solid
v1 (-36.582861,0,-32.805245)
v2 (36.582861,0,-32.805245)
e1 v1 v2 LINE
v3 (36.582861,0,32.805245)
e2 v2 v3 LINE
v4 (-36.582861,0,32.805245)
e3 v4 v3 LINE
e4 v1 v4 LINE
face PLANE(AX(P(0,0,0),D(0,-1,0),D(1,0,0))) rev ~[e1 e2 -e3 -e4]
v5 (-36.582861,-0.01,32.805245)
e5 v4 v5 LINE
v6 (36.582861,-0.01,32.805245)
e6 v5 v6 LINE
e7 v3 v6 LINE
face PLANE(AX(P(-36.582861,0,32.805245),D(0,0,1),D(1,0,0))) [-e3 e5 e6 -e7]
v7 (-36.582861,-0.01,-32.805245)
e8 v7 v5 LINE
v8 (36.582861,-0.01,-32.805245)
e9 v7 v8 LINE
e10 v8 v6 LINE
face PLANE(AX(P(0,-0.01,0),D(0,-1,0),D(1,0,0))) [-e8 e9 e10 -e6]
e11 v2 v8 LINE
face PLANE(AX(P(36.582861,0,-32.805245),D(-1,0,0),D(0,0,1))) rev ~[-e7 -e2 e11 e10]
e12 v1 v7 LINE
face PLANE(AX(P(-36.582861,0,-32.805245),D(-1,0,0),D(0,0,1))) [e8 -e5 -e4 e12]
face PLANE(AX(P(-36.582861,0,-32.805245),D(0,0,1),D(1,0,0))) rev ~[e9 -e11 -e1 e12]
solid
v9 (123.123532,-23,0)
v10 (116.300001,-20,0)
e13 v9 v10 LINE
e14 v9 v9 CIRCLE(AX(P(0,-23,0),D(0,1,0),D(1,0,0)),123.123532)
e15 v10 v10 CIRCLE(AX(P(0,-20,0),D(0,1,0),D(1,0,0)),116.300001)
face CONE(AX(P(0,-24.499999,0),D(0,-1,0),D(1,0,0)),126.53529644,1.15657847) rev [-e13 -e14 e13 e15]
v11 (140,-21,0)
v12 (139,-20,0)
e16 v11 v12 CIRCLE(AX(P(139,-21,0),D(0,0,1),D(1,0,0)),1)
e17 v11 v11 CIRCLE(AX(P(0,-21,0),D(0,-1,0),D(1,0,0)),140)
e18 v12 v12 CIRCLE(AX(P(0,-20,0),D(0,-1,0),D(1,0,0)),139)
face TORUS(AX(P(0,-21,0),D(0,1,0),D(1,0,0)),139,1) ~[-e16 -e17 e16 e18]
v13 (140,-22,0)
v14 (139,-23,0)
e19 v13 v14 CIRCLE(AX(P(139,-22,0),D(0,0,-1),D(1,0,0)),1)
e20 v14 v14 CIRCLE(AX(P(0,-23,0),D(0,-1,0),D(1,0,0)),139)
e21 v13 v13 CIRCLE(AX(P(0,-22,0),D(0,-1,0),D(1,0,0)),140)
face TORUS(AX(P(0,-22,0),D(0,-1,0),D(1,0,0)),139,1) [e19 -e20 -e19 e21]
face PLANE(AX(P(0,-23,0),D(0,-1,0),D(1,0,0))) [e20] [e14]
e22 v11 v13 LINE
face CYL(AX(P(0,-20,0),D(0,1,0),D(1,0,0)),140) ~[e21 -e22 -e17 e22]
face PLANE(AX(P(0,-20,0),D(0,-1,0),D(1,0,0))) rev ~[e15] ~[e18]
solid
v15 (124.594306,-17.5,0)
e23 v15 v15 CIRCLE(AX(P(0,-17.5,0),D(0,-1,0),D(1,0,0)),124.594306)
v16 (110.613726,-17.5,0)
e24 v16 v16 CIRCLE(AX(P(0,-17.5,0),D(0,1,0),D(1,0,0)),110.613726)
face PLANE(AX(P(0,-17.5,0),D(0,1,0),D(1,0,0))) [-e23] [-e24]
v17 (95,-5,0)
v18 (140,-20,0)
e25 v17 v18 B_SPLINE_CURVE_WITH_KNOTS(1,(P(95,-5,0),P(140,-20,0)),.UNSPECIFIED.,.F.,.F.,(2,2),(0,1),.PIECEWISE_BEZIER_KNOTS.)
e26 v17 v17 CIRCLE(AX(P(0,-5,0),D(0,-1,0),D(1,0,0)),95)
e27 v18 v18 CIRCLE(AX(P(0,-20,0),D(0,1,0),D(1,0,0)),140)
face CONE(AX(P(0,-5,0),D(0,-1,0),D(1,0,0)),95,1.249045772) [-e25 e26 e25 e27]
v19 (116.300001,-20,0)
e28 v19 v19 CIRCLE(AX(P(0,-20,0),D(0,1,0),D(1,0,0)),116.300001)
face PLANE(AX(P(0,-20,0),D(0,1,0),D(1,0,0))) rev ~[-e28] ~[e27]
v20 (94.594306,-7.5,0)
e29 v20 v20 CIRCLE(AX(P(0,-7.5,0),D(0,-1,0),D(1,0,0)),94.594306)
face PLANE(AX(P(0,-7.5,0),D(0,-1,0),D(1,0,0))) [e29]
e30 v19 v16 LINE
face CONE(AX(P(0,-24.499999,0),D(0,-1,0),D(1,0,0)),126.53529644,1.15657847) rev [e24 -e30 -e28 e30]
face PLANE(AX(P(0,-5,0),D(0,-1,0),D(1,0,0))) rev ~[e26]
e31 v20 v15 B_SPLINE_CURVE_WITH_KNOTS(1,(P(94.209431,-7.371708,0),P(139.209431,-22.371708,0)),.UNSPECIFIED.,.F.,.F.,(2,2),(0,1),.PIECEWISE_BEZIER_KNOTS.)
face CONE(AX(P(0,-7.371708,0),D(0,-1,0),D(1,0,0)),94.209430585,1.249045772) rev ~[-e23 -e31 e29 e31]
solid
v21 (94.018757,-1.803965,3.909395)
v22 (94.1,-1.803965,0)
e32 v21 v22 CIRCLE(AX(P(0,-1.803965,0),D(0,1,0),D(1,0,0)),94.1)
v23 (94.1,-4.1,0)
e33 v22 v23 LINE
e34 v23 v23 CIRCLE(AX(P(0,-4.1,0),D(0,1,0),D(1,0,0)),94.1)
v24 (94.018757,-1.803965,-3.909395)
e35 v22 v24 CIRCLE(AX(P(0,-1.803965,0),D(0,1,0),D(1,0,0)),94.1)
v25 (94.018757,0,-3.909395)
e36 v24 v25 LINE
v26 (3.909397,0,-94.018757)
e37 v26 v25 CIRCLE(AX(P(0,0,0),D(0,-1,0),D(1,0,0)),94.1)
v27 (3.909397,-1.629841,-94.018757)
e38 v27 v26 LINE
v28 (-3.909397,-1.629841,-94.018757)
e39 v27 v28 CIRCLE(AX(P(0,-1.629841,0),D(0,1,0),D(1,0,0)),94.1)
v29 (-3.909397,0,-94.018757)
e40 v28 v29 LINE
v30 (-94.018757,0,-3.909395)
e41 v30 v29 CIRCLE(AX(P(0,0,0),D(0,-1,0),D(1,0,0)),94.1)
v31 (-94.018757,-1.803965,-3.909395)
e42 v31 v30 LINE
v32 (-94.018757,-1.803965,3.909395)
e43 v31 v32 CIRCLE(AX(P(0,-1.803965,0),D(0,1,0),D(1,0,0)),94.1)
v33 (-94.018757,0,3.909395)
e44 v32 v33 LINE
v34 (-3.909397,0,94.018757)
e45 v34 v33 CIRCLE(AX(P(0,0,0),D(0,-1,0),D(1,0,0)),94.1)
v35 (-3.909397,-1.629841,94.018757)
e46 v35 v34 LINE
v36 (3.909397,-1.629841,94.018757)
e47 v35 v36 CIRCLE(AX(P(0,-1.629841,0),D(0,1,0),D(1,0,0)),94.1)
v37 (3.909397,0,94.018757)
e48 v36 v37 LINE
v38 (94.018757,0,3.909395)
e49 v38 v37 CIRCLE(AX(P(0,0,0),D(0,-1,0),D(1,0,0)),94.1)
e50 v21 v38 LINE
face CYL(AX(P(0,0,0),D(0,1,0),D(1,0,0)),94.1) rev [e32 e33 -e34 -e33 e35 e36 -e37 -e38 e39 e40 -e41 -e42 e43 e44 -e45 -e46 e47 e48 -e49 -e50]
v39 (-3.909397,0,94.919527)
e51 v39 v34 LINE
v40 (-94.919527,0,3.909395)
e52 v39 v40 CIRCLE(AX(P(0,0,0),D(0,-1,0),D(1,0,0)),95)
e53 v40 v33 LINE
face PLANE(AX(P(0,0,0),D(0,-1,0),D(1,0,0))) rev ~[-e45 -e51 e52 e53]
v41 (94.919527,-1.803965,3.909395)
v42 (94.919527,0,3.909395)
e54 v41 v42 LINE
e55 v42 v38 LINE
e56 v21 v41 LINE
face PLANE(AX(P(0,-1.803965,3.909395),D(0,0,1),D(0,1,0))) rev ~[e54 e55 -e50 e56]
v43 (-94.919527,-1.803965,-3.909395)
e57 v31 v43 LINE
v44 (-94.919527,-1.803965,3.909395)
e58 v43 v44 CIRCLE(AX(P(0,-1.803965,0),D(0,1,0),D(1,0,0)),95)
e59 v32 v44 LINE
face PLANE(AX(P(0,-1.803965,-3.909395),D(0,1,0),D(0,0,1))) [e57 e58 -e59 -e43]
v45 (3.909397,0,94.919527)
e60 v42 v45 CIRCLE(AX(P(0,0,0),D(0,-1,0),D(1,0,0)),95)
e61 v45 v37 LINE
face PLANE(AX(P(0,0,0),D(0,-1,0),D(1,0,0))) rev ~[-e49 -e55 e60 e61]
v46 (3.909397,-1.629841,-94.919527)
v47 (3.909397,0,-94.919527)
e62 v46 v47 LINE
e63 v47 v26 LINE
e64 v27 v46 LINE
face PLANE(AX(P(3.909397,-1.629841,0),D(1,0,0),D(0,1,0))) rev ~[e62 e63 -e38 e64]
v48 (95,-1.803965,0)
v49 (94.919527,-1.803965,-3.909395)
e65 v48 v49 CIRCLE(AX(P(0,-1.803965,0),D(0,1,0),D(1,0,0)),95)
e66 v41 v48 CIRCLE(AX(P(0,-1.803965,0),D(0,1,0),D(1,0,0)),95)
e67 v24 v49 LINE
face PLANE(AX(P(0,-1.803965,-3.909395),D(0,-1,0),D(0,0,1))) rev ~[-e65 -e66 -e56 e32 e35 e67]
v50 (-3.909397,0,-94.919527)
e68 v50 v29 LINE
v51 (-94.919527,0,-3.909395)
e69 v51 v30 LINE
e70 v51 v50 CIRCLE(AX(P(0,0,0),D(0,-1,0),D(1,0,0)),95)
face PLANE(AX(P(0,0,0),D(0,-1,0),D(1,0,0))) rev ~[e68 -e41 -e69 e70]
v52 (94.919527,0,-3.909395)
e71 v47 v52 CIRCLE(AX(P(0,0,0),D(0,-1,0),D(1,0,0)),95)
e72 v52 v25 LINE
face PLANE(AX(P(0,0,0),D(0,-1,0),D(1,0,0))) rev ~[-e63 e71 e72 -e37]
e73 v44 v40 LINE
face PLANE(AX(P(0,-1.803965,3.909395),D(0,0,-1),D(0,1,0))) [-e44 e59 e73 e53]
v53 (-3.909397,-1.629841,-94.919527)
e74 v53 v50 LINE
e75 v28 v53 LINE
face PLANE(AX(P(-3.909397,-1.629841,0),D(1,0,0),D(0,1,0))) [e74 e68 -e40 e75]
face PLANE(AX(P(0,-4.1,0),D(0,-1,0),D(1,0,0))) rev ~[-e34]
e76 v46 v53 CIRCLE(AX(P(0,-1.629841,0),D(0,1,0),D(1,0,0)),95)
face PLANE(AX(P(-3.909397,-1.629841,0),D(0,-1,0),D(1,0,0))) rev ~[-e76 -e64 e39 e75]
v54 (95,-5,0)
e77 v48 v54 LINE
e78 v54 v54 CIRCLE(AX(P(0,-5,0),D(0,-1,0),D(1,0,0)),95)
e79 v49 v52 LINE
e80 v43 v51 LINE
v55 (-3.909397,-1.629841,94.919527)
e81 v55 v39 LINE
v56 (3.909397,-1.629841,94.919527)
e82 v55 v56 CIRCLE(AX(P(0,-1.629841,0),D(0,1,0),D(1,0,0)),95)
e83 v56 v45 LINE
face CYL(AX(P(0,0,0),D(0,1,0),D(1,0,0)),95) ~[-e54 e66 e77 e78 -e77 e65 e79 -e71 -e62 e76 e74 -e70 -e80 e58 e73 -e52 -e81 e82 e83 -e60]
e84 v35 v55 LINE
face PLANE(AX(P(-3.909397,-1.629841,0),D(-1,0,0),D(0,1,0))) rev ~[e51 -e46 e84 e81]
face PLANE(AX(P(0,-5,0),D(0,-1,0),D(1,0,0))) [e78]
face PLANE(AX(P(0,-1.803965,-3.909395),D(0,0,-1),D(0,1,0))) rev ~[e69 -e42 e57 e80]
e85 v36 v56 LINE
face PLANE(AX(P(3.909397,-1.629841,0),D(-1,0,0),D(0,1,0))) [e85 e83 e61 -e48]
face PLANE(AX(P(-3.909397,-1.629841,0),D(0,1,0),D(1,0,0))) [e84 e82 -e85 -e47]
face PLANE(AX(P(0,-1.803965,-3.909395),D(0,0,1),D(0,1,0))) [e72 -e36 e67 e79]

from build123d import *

# Parameters (mm, degrees)
F0_R           = 95
F1_DEPTH       = 5
F2_T           = -0.9
F4_R           = 140
F5_DEPTH       = 3
F1_FACE_R      = 95
F5_FACE_R      = 140
F8_R           = 1
F9_T           = -2.5
F10_W          = 7.818793878
F10_H          = 3.2596825622
F11_DEPTH      = 109.4
F11_DEPTH_BACK = 153.9
F12_W          = 3.6079295565
F12_H          = 7.81879
F13_DEPTH      = 116
F13_DEPTH_BACK = 123
F14_W          = 73.1657221913
F14_H          = 65.6104907393
F15_DEPTH      = 0.01


# Not quite as in the source:
# - a feature of the source that left no trace in its solid (it failed there, or was rolled back) is left out


with BuildPart() as f1:
    # F0 (on Front) → F1 (new body)
    with BuildSketch(Plane.XZ):
        Circle(F0_R)
    extrude(amount=F1_DEPTH)

    # F2
    f2_openings = [f1.faces().sort_by_distance(p)[0] for p in [
        (0, 0, 0),
    ]]
    offset(amount=F2_T, openings=f2_openings)

    # F10 (on Top) → F11 (cut, two sides)
    with BuildSketch(Plane.XY) as f11_sk:
        Rectangle(F10_W, F10_H)
    extrude(amount=-F11_DEPTH, mode=Mode.SUBTRACT)
    extrude(f11_sk.sketch, amount=F11_DEPTH_BACK, mode=Mode.SUBTRACT)

    # F12 (on Right) → F13 (cut, two sides)
    with BuildSketch(Plane.YZ) as f13_sk:
        Rectangle(F12_W, F12_H)
    extrude(amount=-F13_DEPTH, mode=Mode.SUBTRACT)
    extrude(f13_sk.sketch, amount=F13_DEPTH_BACK, mode=Mode.SUBTRACT)


with BuildPart() as f5:
    # F4 (on offset) → F5 (new body)
    with BuildSketch(Plane.XZ.offset(20)):
        Circle(F4_R)
    extrude(amount=F5_DEPTH)

    # F8
    f8_edges = [f5.edges().sort_by_distance(p)[0] for p in [
        (-140, -20, 0),
        (-140, -23, 0),
    ]]
    fillet(f8_edges, radius=F8_R)


with BuildPart() as f6:
    # F1_face (on face) → F6 section 0
    with BuildSketch(Plane.XZ.offset(5)):
        Circle(F1_FACE_R)
    # F5_face (on face) → F6 section 1
    with BuildSketch(Plane(origin=(0, -20, 0), x_dir=(1, 0, 0), z_dir=(0, 1, 0))):
        Circle(F5_FACE_R)
    loft()

    # F9 (hollow: no face is removed)
    offset(amount=F9_T, mode=Mode.SUBTRACT)


with BuildPart() as f15:
    # F14 (on Front) → F15 (new body)
    with BuildSketch(Plane.XZ):
        Rectangle(F14_W, F14_H)
    extrude(amount=F15_DEPTH)


with BuildPart() as f17_tool:
    # F16 (on Top) → F17 (revolve)
    with BuildSketch(Plane.XY):
        Polygon((93.0999964476, -9.8000001162), (0, -9.8000001162), (0, -30.2647054195), (126.5352964401, -24.4999993593), align=None)
    revolve(axis=Axis((0, -20.0323527679, 0), (0, -1, 0)))


with BuildPart() as f5_1:
    add(f5.part)

    # F17: cut by f17_tool
    add(f17_tool.part, mode=Mode.SUBTRACT)


with BuildPart() as f6_1:
    add(f6.part)

    # F17: cut by f17_tool
    add(f17_tool.part, mode=Mode.SUBTRACT)


solid = Compound([f1.part, f15.part, f5_1.part, f6_1.part])
